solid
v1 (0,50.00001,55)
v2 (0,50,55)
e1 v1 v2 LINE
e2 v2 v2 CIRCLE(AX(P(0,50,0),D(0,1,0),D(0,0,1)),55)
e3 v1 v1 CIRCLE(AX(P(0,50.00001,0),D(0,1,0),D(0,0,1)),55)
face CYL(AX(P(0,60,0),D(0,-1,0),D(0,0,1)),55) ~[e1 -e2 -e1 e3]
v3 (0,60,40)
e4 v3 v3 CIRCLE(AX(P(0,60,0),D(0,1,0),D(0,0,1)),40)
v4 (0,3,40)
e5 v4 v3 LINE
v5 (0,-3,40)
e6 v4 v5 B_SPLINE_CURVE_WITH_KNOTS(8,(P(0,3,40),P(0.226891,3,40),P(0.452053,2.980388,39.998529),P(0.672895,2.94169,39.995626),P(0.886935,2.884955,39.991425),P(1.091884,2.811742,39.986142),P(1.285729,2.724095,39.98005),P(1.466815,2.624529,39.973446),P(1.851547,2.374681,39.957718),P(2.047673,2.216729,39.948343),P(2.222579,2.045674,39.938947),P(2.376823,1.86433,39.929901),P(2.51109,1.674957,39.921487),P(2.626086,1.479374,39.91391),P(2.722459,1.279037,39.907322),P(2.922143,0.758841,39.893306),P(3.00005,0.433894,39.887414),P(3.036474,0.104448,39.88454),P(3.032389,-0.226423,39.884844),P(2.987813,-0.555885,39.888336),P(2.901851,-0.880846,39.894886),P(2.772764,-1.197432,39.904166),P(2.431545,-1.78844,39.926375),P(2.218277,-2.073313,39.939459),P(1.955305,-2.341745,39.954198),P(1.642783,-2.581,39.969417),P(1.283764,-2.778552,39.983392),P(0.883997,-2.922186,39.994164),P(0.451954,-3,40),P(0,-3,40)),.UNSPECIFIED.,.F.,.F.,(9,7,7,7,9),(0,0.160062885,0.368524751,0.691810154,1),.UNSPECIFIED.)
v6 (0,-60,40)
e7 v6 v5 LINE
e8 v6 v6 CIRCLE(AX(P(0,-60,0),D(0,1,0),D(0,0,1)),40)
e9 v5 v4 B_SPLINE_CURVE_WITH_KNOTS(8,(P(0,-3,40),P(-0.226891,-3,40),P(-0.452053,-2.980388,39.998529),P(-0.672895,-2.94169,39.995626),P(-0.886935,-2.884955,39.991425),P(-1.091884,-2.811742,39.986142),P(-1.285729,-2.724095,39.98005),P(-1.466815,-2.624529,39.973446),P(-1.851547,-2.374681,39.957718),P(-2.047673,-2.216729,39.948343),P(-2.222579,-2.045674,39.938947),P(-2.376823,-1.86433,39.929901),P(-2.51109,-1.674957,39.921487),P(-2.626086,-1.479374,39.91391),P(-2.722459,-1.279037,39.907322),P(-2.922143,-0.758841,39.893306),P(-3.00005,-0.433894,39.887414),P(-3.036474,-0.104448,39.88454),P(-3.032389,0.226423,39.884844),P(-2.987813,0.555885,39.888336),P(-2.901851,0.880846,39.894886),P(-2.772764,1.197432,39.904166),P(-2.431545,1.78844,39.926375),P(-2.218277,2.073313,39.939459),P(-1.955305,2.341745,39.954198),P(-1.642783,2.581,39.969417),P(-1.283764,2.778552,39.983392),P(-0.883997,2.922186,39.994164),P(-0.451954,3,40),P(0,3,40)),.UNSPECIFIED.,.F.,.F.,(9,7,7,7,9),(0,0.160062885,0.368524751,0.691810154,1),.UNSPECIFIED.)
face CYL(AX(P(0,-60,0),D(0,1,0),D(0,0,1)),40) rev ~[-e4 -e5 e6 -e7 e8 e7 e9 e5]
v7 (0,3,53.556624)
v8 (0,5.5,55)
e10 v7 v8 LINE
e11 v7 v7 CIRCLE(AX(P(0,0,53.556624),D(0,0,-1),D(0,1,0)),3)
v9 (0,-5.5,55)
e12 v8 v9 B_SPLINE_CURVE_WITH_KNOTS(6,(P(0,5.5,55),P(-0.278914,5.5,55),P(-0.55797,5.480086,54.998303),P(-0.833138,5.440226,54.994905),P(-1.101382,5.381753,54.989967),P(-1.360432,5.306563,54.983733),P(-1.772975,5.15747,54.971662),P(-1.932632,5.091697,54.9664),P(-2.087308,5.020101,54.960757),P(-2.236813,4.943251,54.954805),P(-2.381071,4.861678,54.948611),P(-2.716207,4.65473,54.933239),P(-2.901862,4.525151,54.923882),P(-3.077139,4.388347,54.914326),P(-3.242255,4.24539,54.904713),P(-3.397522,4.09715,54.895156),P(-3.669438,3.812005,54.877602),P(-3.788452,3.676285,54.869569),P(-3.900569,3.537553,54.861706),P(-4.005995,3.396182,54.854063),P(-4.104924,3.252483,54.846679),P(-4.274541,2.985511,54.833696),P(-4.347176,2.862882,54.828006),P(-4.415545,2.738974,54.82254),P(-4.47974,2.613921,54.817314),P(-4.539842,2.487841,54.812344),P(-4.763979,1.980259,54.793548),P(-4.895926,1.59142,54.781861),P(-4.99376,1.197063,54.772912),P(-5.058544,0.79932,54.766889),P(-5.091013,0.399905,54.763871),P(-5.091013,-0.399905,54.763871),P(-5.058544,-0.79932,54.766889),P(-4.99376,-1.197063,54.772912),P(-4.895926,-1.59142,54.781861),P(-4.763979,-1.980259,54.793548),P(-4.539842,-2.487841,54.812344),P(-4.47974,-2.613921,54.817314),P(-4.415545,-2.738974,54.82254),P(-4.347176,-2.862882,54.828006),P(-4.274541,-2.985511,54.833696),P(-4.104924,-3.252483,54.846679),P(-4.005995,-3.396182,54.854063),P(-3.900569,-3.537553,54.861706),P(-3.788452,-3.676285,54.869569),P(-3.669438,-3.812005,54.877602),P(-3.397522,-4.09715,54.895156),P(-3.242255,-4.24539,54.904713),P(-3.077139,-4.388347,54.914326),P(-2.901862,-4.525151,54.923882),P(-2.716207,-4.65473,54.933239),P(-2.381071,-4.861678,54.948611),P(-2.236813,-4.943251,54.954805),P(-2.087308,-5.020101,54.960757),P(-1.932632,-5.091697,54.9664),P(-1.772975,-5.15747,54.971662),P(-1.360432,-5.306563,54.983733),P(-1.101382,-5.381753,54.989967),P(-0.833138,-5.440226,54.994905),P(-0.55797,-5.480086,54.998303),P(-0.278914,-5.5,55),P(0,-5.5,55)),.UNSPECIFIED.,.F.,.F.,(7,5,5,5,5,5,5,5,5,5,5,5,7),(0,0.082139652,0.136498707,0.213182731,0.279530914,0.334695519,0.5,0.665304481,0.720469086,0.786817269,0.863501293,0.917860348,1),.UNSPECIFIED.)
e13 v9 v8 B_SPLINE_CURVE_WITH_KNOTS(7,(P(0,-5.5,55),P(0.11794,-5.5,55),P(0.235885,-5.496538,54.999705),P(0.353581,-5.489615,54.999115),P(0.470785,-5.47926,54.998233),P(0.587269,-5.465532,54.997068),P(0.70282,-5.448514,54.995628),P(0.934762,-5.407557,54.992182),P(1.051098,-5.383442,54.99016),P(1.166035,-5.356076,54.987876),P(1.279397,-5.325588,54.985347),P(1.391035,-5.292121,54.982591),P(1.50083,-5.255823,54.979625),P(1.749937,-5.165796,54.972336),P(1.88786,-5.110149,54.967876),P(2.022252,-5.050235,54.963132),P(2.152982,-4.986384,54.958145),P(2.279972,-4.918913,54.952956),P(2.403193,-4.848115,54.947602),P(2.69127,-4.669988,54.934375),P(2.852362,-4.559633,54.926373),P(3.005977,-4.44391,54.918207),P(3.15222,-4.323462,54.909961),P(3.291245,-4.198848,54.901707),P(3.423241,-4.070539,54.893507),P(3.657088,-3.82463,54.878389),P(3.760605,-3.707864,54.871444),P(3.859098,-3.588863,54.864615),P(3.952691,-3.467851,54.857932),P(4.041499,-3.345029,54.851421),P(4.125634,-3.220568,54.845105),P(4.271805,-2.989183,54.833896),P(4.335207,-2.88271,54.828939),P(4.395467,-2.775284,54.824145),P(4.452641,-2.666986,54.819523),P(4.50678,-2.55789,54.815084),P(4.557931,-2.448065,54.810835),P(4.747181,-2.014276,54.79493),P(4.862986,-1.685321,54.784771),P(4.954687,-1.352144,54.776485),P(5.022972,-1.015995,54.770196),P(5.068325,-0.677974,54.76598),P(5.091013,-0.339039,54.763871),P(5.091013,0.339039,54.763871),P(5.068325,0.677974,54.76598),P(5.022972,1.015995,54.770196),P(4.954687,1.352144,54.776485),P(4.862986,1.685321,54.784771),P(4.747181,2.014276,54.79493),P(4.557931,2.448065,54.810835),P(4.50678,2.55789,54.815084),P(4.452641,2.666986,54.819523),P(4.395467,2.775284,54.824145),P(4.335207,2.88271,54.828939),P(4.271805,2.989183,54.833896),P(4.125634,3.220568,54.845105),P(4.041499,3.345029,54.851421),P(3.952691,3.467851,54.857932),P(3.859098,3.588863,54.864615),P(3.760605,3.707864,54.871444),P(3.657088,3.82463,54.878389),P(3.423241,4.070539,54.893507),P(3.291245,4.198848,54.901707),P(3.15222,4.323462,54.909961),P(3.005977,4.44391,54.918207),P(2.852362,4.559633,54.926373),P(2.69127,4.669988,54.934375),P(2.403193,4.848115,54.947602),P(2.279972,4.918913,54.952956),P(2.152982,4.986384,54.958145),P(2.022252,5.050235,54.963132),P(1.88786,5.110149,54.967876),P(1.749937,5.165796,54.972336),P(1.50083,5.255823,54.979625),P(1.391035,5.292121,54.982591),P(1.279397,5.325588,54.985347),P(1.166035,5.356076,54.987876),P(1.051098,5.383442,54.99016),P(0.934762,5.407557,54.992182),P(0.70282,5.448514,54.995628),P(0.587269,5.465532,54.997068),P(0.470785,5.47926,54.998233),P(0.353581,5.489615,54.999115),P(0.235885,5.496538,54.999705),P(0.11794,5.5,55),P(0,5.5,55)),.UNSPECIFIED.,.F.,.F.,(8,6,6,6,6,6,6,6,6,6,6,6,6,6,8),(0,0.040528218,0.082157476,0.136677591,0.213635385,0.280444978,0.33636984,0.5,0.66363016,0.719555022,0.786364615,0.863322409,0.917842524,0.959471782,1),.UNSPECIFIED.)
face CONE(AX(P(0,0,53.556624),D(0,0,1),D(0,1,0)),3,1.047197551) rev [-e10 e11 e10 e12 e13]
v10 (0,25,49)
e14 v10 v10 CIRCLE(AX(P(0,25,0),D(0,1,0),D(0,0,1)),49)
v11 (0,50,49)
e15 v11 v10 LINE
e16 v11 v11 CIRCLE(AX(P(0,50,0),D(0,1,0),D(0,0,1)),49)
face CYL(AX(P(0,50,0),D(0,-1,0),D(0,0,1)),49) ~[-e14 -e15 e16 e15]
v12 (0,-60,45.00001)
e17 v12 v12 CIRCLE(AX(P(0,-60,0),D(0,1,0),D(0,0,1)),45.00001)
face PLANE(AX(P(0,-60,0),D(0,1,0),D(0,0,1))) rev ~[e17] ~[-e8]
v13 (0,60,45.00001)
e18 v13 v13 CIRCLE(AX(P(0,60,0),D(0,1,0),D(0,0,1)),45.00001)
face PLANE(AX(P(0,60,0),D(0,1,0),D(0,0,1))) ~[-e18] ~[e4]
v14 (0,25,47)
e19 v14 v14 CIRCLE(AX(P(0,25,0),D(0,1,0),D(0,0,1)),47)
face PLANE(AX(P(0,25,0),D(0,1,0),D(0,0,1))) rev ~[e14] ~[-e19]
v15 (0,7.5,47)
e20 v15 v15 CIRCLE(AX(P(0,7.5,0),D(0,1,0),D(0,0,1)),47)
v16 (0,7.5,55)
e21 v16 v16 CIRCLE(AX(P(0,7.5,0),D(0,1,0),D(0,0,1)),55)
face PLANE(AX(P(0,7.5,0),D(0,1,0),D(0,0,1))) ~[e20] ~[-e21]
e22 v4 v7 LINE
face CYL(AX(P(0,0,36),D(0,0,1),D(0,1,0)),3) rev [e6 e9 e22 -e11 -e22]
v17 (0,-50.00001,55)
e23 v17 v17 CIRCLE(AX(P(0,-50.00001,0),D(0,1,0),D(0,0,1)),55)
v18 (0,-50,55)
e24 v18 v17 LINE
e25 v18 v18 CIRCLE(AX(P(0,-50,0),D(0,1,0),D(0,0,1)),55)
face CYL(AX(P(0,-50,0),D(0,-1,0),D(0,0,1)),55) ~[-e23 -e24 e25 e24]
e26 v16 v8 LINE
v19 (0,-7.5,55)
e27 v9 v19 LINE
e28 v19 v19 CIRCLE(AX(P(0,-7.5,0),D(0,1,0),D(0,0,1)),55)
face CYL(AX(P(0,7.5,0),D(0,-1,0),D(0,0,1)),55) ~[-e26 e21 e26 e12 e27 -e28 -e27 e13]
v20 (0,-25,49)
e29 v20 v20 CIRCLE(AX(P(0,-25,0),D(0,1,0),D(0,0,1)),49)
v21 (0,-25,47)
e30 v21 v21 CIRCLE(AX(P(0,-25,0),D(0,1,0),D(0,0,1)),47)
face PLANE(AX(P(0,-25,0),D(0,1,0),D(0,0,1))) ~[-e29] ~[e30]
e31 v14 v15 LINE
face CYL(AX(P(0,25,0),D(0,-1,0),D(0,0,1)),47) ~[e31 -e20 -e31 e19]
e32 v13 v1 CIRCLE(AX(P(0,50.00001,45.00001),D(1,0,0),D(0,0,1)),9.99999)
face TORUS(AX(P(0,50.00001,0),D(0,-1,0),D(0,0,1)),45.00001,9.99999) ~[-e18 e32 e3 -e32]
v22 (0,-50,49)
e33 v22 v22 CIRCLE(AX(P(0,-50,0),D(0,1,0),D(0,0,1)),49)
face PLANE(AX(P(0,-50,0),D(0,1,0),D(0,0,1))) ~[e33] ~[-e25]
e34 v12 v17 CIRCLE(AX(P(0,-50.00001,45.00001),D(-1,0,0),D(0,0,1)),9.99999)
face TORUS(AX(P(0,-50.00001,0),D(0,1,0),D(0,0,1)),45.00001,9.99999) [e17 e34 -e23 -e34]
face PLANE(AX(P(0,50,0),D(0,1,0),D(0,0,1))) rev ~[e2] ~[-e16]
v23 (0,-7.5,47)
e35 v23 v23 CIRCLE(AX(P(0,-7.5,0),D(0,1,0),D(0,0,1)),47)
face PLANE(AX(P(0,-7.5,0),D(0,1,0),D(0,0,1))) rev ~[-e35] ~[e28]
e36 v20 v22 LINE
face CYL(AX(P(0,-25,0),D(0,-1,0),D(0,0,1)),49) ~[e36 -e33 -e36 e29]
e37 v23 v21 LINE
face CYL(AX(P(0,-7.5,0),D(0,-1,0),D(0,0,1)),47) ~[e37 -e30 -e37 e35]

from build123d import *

# Parameters (mm, degrees)
F4_R = 9.99999


# Not quite as in the source:
# - a fillet or chamfer is up to 0.001 mm smaller than in the source, because OpenCascade refuses the exact size


with BuildPart() as f1:
    # F0 (on Right) → F1 (revolve)
    with BuildSketch(Plane.YZ):
        Polygon((-60, 55), (-60, 40), (60, 40), (60, 55), (50, 55), (50, 49), (25, 49), (25, 47), (7.5, 47), (7.5, 55), (-7.5, 55), (-7.5, 47), (-25, 47), (-25, 49), (-50, 49), (-50, 55), align=None)
    revolve(axis=Axis((0, -7.7097125049, 0), (0, 1, 0)))

    # F2 (on Right) → F3 (revolve, cut)
    with BuildSketch(Plane.YZ):
        Polygon((7.2320508076, 56), (0, 56), (0, 36), (3, 36), (3, 53.556624327), align=None)
    revolve(axis=Axis((0, 0, 50.0545714922), (0, 0, -1)), mode=Mode.SUBTRACT)

    # F4 (radius 10 in the source; OpenCascade refuses exactly that, so slightly less here)
    f4_edges = [f1.edges().sort_by_distance(p)[0] for p in [
        (0, 60, -55),
        (0, -60, -55),
    ]]
    fillet(f4_edges, radius=F4_R)


solid = f1.part
